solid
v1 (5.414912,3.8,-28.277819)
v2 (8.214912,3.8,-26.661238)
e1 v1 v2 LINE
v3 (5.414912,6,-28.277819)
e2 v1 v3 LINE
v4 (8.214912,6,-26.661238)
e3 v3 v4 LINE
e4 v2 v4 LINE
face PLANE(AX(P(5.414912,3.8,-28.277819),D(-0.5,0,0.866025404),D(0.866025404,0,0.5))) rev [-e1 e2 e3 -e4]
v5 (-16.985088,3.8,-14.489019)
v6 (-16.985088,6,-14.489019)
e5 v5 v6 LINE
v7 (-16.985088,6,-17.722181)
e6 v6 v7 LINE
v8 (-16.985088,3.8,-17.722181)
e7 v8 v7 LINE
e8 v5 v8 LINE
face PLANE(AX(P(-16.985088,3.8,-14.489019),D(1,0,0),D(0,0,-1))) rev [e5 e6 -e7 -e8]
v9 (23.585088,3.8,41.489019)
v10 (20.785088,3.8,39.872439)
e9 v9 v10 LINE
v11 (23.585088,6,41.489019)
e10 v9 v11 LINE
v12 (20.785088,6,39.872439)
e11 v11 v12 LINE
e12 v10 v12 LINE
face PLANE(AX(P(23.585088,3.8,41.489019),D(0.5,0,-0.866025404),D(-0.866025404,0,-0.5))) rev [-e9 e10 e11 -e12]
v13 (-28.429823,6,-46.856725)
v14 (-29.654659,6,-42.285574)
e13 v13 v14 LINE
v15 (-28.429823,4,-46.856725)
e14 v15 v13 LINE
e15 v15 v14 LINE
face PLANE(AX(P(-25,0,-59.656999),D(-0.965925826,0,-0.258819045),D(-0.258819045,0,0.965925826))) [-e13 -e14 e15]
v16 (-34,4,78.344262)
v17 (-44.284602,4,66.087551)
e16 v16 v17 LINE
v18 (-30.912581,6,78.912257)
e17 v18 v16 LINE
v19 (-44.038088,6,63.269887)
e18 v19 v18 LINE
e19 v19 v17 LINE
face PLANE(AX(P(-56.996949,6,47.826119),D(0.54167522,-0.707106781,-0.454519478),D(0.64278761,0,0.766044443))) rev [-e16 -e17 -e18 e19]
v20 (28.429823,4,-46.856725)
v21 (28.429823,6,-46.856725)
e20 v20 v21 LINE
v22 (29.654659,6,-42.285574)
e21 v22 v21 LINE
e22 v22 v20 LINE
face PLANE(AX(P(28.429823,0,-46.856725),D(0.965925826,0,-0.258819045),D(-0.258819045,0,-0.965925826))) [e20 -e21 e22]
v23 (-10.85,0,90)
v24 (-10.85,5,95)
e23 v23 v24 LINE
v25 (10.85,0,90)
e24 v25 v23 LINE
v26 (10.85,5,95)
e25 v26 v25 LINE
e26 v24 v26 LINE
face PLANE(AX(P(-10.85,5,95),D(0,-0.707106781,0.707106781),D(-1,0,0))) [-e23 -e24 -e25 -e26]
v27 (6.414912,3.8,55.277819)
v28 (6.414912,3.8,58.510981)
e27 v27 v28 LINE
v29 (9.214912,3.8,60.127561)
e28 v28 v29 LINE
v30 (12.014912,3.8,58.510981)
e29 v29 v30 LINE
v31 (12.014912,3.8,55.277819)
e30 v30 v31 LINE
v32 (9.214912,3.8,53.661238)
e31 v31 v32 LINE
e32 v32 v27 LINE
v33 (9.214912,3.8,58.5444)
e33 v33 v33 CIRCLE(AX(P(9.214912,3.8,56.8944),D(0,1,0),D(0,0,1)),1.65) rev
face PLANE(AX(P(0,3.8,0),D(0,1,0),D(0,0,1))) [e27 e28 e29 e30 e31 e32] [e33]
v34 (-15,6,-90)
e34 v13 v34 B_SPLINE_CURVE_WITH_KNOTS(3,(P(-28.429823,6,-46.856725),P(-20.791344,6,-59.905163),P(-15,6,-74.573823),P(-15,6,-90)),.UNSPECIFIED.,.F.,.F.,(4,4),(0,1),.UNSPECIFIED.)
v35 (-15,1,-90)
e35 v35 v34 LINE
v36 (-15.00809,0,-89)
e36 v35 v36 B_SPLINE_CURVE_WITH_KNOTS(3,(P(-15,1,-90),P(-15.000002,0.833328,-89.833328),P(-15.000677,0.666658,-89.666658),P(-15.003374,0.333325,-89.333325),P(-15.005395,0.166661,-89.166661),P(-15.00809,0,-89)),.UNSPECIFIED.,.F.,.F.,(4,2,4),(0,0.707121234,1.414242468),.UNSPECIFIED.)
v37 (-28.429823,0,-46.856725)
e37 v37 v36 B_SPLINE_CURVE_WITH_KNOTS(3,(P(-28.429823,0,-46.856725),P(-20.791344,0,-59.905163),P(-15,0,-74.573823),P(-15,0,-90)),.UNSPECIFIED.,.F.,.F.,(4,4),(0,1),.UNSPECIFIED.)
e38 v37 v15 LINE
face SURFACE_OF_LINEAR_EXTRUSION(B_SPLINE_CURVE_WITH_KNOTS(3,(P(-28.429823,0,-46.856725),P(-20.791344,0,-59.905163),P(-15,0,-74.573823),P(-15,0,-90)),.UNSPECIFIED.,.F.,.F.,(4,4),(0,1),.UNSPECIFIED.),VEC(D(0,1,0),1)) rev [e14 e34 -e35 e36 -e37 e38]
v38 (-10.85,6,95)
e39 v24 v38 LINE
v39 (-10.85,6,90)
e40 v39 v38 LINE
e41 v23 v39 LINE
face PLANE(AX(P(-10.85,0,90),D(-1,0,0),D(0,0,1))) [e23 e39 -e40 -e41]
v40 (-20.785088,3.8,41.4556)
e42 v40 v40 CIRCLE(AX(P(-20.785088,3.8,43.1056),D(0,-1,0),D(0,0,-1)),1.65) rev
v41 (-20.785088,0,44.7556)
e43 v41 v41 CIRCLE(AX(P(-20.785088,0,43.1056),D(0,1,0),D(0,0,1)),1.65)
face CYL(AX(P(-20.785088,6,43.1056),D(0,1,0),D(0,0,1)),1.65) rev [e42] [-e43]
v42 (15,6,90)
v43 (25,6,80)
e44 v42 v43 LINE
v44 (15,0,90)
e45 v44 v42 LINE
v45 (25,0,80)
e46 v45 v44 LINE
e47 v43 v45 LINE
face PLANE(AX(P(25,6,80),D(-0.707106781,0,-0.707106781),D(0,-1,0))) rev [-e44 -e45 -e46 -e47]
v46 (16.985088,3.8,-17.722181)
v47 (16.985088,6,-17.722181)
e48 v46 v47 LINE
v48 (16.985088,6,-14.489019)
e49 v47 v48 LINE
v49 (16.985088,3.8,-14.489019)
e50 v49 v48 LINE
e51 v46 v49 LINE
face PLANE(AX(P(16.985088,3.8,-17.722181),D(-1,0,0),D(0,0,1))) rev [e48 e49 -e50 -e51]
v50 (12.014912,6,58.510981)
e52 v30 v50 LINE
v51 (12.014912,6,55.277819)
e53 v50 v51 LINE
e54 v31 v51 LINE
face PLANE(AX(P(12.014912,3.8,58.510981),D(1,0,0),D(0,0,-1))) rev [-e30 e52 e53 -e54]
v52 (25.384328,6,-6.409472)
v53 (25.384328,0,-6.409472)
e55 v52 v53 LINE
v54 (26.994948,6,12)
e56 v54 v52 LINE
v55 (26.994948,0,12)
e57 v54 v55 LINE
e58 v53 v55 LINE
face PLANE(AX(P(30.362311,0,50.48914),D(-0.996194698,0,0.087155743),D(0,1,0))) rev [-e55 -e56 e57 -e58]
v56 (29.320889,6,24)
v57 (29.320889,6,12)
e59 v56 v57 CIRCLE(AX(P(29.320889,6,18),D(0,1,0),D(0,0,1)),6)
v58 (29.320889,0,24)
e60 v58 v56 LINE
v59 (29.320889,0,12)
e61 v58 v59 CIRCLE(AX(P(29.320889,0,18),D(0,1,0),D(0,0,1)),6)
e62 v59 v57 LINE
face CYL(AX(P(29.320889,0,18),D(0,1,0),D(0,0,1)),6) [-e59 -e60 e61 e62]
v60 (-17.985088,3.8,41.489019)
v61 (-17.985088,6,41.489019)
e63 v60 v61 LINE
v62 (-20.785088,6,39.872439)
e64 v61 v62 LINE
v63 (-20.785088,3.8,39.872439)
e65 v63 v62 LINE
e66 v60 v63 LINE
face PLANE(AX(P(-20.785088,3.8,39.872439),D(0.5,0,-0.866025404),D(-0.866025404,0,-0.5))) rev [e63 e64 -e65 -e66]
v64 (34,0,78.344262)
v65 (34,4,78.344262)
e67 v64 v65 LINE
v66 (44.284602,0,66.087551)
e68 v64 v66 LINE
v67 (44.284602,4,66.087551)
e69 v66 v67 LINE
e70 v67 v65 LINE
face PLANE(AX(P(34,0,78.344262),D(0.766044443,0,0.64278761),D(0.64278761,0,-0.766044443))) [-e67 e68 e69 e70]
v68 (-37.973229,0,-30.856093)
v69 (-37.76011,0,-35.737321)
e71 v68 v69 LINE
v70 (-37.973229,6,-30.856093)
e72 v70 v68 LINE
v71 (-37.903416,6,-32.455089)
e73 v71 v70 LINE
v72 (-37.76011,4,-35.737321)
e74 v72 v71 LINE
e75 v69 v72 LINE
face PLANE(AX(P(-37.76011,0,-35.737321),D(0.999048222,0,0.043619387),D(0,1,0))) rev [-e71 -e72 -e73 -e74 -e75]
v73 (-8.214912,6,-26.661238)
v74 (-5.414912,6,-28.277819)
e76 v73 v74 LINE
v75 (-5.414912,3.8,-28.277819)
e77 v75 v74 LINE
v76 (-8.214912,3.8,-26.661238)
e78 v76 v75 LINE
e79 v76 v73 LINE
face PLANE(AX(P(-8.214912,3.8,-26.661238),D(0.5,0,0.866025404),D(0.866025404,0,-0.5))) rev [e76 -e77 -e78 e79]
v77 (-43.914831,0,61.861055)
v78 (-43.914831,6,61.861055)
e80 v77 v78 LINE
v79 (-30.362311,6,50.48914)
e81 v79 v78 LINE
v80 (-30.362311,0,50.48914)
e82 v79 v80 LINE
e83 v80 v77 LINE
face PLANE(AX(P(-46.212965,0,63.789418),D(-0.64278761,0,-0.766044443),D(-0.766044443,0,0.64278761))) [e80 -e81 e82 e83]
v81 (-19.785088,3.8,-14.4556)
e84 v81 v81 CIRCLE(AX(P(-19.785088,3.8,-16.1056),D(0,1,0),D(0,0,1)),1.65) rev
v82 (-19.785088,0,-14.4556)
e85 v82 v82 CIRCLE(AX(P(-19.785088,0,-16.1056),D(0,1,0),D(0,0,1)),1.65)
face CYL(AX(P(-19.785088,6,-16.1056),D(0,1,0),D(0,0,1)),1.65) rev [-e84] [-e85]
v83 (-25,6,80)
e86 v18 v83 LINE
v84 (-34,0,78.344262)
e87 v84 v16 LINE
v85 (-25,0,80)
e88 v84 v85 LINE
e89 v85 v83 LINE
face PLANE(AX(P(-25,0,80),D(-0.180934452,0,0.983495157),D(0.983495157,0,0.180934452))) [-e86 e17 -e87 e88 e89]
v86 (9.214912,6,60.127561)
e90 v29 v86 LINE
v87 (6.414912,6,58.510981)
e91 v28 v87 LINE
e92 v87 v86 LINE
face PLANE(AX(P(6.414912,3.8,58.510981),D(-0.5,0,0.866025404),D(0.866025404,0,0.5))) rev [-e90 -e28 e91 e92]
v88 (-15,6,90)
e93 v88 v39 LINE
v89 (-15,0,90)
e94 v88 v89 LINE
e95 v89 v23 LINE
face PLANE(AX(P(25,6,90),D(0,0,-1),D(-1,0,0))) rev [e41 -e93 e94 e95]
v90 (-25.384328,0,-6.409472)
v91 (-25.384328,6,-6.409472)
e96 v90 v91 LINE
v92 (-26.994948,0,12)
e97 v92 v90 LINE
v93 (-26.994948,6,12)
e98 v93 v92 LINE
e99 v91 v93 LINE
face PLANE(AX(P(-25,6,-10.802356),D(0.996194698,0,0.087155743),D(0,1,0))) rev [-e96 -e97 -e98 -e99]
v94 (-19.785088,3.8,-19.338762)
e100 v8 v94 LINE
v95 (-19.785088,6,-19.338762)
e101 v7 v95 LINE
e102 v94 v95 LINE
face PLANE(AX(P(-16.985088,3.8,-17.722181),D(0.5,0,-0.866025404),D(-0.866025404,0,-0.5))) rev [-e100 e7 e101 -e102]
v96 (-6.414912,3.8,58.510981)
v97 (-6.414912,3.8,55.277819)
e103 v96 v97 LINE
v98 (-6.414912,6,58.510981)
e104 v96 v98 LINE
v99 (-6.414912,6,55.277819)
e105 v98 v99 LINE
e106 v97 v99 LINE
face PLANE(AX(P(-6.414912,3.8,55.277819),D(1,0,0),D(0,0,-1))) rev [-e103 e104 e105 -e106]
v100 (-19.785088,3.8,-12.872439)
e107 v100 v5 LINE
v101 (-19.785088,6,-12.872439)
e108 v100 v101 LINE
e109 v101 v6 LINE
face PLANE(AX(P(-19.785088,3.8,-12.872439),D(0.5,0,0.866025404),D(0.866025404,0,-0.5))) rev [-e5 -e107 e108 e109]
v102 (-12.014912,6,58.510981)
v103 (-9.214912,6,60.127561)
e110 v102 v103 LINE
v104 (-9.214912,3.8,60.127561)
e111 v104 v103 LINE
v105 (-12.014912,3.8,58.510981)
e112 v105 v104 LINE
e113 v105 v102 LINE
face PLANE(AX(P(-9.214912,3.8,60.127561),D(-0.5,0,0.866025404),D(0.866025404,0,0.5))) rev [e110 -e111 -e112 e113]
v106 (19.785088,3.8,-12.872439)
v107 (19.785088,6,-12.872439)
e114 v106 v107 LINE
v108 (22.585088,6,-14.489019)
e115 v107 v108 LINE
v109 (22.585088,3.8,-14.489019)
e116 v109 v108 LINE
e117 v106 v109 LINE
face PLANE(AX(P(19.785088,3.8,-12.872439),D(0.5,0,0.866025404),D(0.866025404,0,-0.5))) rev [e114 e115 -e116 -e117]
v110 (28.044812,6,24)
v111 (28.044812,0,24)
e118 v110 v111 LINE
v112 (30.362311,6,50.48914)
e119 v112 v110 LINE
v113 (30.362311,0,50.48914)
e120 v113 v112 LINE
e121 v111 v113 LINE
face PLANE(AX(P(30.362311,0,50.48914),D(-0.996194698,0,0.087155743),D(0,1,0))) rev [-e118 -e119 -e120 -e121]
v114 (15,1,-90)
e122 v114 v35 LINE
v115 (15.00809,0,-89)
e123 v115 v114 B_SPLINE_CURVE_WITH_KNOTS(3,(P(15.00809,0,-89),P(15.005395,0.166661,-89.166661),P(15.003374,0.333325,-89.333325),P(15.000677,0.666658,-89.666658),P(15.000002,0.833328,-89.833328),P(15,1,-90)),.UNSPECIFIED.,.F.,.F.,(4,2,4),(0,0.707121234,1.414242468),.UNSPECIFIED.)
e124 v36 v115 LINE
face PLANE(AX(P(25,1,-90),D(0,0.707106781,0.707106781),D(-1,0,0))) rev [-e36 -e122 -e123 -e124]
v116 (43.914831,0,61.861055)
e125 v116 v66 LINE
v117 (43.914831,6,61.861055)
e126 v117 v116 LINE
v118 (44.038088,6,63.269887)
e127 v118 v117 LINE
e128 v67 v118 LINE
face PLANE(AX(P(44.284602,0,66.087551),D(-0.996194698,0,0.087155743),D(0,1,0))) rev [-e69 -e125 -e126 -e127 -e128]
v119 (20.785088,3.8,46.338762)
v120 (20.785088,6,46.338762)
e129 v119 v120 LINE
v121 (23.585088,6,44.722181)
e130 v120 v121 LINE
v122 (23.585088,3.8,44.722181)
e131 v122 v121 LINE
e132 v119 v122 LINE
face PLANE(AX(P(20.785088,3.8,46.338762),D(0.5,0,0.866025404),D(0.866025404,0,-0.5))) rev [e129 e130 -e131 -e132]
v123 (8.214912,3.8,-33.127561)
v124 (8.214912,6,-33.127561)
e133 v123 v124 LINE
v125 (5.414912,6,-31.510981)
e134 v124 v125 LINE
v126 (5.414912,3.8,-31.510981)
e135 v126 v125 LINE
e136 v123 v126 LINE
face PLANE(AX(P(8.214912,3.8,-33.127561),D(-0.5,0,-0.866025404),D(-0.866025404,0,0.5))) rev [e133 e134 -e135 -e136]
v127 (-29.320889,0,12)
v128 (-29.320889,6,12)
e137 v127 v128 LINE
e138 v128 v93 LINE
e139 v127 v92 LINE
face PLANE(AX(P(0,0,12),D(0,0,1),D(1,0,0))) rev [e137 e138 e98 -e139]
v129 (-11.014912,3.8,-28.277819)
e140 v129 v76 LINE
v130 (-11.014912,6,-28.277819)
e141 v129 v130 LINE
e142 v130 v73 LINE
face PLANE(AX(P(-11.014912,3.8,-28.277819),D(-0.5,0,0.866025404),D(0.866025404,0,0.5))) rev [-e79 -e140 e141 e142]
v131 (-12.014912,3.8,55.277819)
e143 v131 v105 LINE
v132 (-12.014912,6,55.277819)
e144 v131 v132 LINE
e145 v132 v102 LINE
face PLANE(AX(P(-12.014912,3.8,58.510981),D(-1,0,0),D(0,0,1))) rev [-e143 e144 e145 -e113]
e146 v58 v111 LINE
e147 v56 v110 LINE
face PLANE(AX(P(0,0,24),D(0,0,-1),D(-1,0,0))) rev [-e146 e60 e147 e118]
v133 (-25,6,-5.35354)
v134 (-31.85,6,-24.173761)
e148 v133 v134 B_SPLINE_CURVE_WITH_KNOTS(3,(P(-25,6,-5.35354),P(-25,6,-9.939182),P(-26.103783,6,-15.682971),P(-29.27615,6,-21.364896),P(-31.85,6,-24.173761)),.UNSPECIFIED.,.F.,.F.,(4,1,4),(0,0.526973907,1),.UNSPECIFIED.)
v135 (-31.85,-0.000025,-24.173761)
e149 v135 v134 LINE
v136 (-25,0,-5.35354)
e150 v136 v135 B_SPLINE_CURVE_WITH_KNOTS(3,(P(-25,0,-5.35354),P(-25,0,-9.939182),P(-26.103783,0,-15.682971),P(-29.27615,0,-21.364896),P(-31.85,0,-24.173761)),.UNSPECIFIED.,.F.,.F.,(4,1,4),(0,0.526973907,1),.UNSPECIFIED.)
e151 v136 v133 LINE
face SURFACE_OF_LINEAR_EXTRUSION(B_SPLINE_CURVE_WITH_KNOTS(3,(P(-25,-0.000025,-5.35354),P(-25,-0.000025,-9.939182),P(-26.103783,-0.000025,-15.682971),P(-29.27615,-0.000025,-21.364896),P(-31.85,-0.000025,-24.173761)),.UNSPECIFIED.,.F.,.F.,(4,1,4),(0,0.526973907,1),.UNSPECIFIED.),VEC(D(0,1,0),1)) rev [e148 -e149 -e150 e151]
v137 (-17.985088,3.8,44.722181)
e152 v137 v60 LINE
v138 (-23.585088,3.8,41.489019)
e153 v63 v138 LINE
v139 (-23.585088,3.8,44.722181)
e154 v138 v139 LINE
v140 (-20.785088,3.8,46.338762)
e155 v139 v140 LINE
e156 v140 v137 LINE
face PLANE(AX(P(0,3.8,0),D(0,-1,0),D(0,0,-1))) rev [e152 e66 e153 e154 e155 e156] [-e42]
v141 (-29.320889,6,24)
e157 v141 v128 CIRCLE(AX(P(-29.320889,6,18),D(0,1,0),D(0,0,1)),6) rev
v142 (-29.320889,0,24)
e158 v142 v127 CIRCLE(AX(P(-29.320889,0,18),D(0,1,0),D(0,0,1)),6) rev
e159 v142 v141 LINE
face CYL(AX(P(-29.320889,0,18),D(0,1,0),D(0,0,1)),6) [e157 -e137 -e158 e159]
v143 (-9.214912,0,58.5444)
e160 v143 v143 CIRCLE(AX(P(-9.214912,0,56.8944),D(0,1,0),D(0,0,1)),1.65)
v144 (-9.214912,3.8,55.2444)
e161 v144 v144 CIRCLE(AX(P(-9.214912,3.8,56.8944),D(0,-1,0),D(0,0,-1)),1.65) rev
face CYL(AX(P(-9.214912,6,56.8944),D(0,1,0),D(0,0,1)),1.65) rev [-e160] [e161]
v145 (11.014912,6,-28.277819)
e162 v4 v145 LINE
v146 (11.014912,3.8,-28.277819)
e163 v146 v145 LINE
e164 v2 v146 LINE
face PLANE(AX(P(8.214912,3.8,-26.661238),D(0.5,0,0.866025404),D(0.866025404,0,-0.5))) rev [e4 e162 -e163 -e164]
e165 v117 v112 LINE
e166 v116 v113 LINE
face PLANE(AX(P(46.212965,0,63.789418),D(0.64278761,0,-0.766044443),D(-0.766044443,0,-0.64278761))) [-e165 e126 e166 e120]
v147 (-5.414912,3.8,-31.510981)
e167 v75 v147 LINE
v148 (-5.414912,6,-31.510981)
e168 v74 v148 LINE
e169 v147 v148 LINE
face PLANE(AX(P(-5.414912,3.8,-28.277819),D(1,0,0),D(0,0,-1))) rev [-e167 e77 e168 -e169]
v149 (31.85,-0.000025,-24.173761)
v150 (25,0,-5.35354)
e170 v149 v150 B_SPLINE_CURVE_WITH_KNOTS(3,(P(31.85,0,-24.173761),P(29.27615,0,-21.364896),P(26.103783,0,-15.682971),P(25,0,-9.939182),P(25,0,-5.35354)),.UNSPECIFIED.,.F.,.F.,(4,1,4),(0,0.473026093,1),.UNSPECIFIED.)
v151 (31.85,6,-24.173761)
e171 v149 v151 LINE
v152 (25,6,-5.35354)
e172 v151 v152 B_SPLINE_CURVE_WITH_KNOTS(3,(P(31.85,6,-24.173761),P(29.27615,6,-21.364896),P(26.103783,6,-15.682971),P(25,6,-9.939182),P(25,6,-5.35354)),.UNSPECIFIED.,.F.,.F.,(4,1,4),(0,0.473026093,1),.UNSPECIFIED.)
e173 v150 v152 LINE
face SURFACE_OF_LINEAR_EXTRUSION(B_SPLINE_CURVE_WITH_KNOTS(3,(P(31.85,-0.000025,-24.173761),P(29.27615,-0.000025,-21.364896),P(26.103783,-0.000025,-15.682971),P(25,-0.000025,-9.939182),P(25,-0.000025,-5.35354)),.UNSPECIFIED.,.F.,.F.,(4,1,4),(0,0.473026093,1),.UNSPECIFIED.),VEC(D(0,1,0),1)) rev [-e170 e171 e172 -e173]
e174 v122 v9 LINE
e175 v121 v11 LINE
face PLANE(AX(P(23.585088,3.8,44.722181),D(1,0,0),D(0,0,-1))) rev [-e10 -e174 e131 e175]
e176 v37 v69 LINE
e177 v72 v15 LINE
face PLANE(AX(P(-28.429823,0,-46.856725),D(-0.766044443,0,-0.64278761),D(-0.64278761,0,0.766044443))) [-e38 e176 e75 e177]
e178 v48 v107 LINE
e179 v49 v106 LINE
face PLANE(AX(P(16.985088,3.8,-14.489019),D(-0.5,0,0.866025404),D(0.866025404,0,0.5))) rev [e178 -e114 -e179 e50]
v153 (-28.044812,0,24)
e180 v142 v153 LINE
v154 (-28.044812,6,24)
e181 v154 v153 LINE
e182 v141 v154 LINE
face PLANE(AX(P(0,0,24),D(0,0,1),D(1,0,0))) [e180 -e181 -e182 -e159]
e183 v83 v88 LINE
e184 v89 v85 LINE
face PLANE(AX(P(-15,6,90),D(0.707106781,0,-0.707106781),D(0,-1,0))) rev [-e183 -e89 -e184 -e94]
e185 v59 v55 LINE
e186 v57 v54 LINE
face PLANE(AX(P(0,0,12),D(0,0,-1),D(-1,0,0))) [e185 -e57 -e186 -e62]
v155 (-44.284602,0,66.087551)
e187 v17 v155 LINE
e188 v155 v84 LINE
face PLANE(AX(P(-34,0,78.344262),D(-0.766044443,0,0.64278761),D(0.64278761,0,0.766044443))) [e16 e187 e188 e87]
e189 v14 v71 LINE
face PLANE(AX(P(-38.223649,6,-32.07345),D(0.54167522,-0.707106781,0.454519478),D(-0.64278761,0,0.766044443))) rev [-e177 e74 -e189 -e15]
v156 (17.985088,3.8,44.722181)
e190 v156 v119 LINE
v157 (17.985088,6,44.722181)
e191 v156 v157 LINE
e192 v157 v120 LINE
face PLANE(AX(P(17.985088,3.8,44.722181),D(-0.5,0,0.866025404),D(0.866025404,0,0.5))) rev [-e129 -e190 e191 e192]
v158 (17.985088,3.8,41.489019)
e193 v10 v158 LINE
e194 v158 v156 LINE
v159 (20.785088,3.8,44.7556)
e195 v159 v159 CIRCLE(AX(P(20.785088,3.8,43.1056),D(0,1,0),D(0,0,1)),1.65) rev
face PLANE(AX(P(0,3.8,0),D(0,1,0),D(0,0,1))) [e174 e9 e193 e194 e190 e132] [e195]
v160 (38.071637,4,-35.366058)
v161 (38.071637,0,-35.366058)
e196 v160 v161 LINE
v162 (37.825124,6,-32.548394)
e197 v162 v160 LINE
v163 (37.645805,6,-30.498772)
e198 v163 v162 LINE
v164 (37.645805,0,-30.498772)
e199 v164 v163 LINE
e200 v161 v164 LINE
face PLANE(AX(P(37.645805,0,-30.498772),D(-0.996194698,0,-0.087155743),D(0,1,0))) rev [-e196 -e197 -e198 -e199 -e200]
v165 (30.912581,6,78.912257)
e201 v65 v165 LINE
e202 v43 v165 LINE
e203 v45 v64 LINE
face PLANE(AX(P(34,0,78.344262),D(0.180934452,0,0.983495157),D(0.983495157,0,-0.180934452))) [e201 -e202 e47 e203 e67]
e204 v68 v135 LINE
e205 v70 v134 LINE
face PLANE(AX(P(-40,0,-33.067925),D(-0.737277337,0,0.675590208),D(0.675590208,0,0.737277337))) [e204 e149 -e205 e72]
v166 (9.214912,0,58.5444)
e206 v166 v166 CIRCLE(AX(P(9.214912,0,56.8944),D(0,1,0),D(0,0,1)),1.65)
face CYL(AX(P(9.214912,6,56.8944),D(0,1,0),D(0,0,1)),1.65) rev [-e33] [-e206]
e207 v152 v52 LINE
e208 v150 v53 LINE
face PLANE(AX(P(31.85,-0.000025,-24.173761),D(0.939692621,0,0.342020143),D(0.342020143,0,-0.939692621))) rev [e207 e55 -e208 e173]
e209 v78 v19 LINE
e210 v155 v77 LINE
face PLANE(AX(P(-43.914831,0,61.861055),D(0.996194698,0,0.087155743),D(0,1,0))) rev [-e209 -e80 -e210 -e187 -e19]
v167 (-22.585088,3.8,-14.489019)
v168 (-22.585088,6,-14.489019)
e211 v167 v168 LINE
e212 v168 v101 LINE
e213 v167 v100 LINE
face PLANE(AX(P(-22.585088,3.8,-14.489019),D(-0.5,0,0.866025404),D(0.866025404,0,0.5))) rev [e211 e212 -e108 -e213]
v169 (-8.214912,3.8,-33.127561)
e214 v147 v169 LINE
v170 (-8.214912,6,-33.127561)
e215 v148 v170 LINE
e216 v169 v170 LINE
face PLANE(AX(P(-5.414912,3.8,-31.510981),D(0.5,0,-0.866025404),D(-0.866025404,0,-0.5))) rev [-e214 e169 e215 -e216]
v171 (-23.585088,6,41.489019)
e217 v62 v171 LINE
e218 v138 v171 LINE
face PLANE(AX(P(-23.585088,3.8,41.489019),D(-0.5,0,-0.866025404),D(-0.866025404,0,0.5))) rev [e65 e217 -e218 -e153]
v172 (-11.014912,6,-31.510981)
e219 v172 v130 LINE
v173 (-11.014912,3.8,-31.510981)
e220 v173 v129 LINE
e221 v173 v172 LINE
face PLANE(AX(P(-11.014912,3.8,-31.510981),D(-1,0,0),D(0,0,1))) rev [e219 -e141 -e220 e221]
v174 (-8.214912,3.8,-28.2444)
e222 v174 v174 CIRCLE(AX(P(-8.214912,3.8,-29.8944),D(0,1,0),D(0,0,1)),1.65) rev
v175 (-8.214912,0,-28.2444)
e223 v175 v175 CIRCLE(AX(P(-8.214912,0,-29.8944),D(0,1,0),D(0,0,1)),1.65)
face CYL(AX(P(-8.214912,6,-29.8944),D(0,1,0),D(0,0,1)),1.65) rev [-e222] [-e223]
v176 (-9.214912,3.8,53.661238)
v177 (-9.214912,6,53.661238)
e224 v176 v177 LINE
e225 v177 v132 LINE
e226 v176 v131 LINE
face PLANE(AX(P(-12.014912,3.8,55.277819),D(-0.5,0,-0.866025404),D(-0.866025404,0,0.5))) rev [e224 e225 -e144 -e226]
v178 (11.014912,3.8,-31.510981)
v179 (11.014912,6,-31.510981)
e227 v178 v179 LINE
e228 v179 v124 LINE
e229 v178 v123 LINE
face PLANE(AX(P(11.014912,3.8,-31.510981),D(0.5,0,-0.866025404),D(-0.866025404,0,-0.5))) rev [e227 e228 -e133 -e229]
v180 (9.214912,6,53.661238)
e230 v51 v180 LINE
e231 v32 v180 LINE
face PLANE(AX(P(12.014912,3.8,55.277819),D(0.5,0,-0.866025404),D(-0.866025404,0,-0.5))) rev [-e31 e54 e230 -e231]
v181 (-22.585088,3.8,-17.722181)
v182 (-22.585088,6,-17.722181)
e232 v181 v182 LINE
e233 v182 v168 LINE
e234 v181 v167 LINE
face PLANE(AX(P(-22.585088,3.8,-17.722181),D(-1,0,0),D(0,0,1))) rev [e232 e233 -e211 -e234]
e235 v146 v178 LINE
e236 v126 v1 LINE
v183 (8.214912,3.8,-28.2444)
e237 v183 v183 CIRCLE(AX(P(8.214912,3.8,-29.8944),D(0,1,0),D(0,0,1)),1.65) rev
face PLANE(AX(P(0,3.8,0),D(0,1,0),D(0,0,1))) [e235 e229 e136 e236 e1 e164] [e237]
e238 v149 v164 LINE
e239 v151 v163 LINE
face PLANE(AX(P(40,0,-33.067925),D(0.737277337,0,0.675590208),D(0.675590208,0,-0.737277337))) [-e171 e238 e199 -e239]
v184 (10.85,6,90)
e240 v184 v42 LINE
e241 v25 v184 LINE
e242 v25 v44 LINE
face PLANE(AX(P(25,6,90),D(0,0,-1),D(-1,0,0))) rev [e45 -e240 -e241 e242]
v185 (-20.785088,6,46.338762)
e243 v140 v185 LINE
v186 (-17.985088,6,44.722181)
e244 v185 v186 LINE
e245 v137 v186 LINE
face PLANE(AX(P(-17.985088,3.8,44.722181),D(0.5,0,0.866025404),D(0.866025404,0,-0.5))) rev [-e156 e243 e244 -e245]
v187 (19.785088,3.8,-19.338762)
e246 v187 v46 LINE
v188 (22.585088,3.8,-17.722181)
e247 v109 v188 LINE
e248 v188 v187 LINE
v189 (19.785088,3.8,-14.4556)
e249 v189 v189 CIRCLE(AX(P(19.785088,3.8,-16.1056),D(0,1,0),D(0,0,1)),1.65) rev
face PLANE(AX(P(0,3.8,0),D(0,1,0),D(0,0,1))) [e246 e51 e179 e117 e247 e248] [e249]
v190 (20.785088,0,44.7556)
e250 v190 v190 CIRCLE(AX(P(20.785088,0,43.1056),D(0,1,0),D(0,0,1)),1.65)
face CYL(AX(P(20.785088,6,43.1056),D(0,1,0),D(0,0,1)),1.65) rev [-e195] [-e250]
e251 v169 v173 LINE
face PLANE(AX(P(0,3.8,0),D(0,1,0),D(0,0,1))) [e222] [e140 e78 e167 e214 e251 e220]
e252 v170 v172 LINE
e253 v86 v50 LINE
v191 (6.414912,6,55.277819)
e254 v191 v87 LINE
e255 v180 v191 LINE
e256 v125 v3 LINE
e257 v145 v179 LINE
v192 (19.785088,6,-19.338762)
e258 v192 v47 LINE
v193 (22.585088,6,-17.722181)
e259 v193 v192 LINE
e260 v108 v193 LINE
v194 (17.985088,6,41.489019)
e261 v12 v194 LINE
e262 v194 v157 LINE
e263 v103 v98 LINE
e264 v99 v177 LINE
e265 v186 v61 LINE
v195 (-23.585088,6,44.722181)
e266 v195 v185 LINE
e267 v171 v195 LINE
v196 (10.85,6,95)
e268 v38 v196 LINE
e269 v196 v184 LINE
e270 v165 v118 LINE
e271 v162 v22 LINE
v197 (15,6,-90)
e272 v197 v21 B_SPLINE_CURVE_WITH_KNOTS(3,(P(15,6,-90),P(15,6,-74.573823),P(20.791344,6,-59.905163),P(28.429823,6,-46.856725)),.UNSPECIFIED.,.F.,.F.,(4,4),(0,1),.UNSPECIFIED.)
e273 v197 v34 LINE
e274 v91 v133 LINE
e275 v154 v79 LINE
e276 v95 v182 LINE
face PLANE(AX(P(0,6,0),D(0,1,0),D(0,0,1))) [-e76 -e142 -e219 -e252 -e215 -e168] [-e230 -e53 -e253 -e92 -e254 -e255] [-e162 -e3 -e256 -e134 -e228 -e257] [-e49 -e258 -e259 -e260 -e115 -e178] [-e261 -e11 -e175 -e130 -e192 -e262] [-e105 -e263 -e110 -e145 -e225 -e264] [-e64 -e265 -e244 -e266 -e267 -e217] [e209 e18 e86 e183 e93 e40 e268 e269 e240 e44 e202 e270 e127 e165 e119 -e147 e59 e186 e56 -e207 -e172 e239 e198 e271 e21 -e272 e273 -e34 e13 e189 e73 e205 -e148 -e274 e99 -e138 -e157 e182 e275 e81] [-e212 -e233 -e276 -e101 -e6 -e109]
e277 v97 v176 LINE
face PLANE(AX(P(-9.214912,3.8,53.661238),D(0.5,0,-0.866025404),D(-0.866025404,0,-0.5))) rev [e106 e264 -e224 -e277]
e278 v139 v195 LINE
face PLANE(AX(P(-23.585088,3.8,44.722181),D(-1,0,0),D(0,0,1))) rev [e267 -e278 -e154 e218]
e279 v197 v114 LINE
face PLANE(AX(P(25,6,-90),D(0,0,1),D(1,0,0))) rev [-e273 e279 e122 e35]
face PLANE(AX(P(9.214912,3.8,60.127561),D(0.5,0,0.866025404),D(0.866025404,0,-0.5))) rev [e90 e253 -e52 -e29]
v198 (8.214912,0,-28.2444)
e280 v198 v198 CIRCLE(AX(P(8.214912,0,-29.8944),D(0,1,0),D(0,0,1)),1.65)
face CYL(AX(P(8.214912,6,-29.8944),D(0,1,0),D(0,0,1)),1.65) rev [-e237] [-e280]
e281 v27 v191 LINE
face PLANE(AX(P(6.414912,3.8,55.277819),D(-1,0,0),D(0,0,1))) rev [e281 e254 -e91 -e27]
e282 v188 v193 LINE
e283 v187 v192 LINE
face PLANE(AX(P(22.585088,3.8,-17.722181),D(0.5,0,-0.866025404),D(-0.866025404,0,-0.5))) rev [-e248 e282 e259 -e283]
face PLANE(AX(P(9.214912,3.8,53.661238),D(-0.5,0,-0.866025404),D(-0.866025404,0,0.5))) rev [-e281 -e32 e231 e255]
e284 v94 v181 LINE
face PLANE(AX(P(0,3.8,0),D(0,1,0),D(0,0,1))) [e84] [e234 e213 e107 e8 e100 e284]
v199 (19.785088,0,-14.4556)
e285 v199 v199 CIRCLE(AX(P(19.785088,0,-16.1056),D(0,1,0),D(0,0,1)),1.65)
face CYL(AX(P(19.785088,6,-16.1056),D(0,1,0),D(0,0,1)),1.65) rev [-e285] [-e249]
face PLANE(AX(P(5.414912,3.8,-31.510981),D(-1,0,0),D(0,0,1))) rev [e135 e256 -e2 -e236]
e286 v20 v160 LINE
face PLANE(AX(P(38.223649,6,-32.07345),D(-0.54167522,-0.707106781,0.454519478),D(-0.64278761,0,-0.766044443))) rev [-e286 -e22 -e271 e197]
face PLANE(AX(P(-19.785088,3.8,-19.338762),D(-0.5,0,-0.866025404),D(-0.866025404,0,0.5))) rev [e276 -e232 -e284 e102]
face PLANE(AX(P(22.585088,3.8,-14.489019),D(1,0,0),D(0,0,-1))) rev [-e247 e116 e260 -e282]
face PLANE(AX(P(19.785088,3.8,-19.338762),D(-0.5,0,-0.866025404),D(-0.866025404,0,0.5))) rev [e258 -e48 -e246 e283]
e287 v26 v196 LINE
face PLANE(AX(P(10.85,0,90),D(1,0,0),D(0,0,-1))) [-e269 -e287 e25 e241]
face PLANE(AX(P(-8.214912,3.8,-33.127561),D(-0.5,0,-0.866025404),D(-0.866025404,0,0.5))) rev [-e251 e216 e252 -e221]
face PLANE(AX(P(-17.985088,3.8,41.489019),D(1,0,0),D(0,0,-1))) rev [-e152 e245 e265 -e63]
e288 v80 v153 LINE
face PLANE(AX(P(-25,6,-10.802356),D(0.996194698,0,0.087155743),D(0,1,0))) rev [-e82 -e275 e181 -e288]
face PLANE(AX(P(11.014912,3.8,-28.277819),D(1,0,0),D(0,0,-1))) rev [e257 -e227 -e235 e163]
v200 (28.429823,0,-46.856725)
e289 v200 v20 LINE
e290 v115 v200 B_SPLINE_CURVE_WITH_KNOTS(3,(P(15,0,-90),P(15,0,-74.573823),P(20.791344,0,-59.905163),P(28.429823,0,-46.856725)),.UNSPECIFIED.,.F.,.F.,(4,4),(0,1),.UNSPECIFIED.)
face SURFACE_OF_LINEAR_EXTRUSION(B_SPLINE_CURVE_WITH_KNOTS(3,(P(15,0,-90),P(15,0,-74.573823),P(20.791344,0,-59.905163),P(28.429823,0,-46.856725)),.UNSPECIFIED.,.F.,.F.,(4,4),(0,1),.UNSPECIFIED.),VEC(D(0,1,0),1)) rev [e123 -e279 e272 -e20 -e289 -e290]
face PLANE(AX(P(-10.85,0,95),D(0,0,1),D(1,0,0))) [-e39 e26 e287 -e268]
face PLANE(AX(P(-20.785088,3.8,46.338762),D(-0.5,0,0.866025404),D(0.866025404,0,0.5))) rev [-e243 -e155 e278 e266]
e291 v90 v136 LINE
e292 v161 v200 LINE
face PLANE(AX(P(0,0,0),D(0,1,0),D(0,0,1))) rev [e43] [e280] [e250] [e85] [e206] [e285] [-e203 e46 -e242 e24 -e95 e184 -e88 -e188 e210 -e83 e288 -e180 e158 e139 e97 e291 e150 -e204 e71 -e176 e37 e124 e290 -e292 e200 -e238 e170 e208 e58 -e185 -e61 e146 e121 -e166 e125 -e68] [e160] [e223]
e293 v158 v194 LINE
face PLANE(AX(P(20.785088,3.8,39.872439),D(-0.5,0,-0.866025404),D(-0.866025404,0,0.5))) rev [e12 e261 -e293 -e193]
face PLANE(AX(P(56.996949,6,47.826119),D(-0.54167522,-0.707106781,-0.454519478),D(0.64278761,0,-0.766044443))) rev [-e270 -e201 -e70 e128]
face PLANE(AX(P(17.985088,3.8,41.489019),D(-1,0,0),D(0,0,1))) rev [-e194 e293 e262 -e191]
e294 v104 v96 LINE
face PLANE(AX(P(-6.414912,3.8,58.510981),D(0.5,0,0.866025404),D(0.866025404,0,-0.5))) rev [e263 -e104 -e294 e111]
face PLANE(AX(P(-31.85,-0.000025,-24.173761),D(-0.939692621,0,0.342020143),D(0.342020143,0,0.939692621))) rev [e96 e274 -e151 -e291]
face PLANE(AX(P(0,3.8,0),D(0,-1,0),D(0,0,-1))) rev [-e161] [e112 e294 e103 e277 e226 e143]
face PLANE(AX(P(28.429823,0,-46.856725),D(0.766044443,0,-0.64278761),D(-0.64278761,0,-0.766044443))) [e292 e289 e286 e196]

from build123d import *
from OCP.BRepFilletAPI import BRepFilletAPI_MakeChamfer

# Parameters (mm, degrees)
SKETCH1_W                  = 50
SKETCH1_H                  = 180
BOSS_EXTRUDE1_DEPTH        = 6
CHAMFER2_SIZE              = 10
F_3_3_3_3_DIAMETER_HOLE1_D = 3.3
BOSS_EXTRUDE3_DEPTH        = 6
CUT_EXTRUDE3_DEPTH         = 2.2
BOSS_EXTRUDE4_DEPTH        = 6
CHAMFER14_SIZE             = 2
CHAMFER16_SIZE             = 7
CHAMFER16_SIZE_2           = 56.79198309
CHAMFER17_SIZE             = 2
SKETCH59_W                 = 21.7
SKETCH59_H                 = 5
BOSS_EXTRUDE5_DEPTH        = 6
CHAMFER19_SIZE             = 5
CUT_EXTRUDE28_DEPTH        = 106.814167745
CHAMFER20_SIZE             = 3
CHAMFER20_SIZE2            = 3.484649721
CUT_EXTRUDE29_DEPTH        = 105.986313168
CHAMFER24_SIZE             = 1
CUT_EXTRUDE31_DEPTH        = 105.986313306
SKETCH66_R                 = 6
BOSS_EXTRUDE6_DEPTH        = 6


with BuildPart() as part:
    # Sketch1 → Boss-Extrude1 (new body)
    with BuildSketch(Plane(origin=(0, 0, 0), x_dir=(1, 0, 0), z_dir=(0, 1, 0))):
        Rectangle(SKETCH1_W, SKETCH1_H)
    extrude(amount=BOSS_EXTRUDE1_DEPTH)

    # Chamfer2
    chamfer2_edges = [part.edges().sort_by_distance(p)[0] for p in [
        (-25, 3, -90),
        (25, 3, -90),
        (25, 3, 90),
        (-25, 3, 90),
    ]]
    chamfer(chamfer2_edges, length=CHAMFER2_SIZE)

    # Ø3.3 (3.3) Diameter Hole1 (through all)
    with Locations(Plane(origin=(0, 6, 0), x_dir=(1, 0, 0), z_dir=(0, 1, 0))):
        with Locations((-19.785088487, 16.105600012), (9.214911513, -56.894399988), (20.785088487, -43.105600012), (-9.214911513, -56.894399988), (-20.785088487, -43.105600012), (19.785088487, 16.105600012), (8.214911513, 29.894399988), (-8.214911513, 29.894399988)):
            Hole(F_3_3_3_3_DIAMETER_HOLE1_D / 2)

    # Sketch52 → Boss-Extrude3 (add, through all)
    with BuildSketch(Plane(origin=(0, 6, 0), x_dir=(1, 0, 0), z_dir=(0, 1, 0))):
        Polygon((40, 33.067924807), (31.85, 24.173760523), (25, 5.3535402), (25, 59.656998575), (28.429823026, 46.856724783), align=None)
        Polygon((-28.429823026, 46.856724783), (-40, 33.067924807), (-31.85, 24.173760523), (-25, 5.3535402), (-25, 59.656998575), align=None)
    extrude(amount=-BOSS_EXTRUDE3_DEPTH)

    # Sketch11 → Cut-Extrude3 (cut)
    with BuildSketch(Plane(origin=(0, 6, 0), x_dir=(1, 0, 0), z_dir=(0, 1, 0))):
        Polygon((23.585088487, -44.722180766), (23.585088487, -41.489019258), (20.785088487, -39.872438504), (17.985088487, -41.489019258), (17.985088487, -44.722180766), (20.785088487, -46.338761519), align=None)
        Polygon((9.214911513, -60.127561496), (12.014911513, -58.510980742), (12.014911513, -55.277819234), (9.214911513, -53.661238481), (6.414911513, -55.277819234), (6.414911513, -58.510980742), align=None)
        Polygon((-6.414911513, -58.510980742), (-9.214911513, -60.127561496), (-12.014911513, -58.510980742), (-12.014911513, -55.277819234), (-9.214911513, -53.661238481), (-6.414911513, -55.277819234), align=None)
        Polygon((-20.785088487, -46.338761519), (-23.585088487, -44.722180766), (-23.585088487, -41.489019258), (-20.785088487, -39.872438504), (-17.985088487, -41.489019258), (-17.985088487, -44.722180766), align=None)
        Polygon((19.785088487, 12.872438504), (22.585088487, 14.489019258), (22.585088487, 17.722180766), (19.785088487, 19.338761519), (16.985088487, 17.722180766), (16.985088487, 14.489019258), align=None)
        Polygon((8.214911513, 26.661238481), (11.014911513, 28.277819234), (11.014911513, 31.510980742), (8.214911513, 33.127561496), (5.414911513, 31.510980742), (5.414911513, 28.277819234), align=None)
        Polygon((-19.785088487, 12.872438504), (-16.985088487, 14.489019258), (-16.985088487, 17.722180766), (-19.785088487, 19.338761519), (-22.585088487, 17.722180766), (-22.585088487, 14.489019258), align=None)
        Polygon((-8.214911513, 26.661238481), (-5.414911513, 28.277819234), (-5.414911513, 31.510980742), (-8.214911513, 33.127561496), (-11.014911513, 31.510980742), (-11.014911513, 28.277819234), align=None)
    extrude(amount=-CUT_EXTRUDE3_DEPTH, mode=Mode.SUBTRACT)

    # Sketch53 → Boss-Extrude4 (add, through all)
    with BuildSketch(Plane(origin=(0, 6, 0), x_dir=(1, 0, 0), z_dir=(0, 1, 0))):
        Polygon((25, -45.989627063), (25, -80), (34, -78.344262241), (46.212964584, -63.789417822), align=None)
        Polygon((-46.212964584, -63.789417822), (-25, -45.989627063), (-25, -80), (-34, -78.344262241), align=None)
    extrude(amount=-BOSS_EXTRUDE4_DEPTH)

    # Chamfer14
    chamfer14_edges = [part.edges().sort_by_distance(p)[0] for p in [
        (-40.106482292, 6, 71.066840031),
        (40.106482292, 6, 71.066840031),
    ]]
    chamfer(chamfer14_edges, length=CHAMFER14_SIZE)

    # Chamfer16
    # the kernel refuses this chamfer: 56.79198309, 7 mm, written as the material it adds along each edge
    with BuildSketch(Plane(origin=(25, 6, 45.989627063), x_dir=(0.6351042832999635, 0, 0.7724264038301901), z_dir=(0, -1, 0))) as chamfer16_piece_1:
        Polygon((CHAMFER16_SIZE * 0.9830242288, -CHAMFER16_SIZE * 0.183475790208), (-CHAMFER16_SIZE_2 * 0.772426403828, -CHAMFER16_SIZE_2 * 0.635104283298), (0, 0), align=None)
    extrude(amount=6)
    with BuildSketch(Plane(origin=(-25, 6, 45.989627063), x_dir=(-0.6351042832999635, 0, 0.7724264038301901), z_dir=(0, -1, 0))) as chamfer16_piece_2:
        Polygon((CHAMFER16_SIZE * 0.9830242288, CHAMFER16_SIZE * 0.183475790208), (-CHAMFER16_SIZE_2 * 0.772426403828, CHAMFER16_SIZE_2 * 0.635104283298), (0, 0), align=None)
    extrude(amount=6)

    # Chamfer17
    chamfer17_edges = [part.edges().sort_by_distance(p)[0] for p in [
        (-34.214911513, 6, -39.962324795),
        (34.214911513, 6, -39.962324795),
    ]]
    chamfer(chamfer17_edges, length=CHAMFER17_SIZE)

    # Sketch59 → Boss-Extrude5 (add, through all)
    with BuildSketch(Plane(origin=(0, 6, 0), x_dir=(1, 0, 0), z_dir=(0, 1, 0))):
        with Locations((0, -92.5)):
            Rectangle(SKETCH59_W, SKETCH59_H)
    extrude(amount=-BOSS_EXTRUDE5_DEPTH)

    # Chamfer19
    chamfer19_edges = [part.edges().sort_by_distance(p)[0] for p in [
        (0, 0, 95),
    ]]
    chamfer(chamfer19_edges, length=CHAMFER19_SIZE)

    # Sketch61 → Cut-Extrude28 (cut, through all)
    with BuildSketch(Plane.XZ):
        Polygon((25, -59.656998575), (15, -90), (25, -80), align=None)
        Polygon((-25, -80), (-25, -59.656998575), (-15, -90), align=None)
    extrude(amount=-CUT_EXTRUDE28_DEPTH, mode=Mode.SUBTRACT)

    # Chamfer20: one chamfer whose edges measure the first distance from different faces: ONE call of the kernel's chamfer builder (chamfer() names one face for all edges)
    chamfer20_edges_1 = [part.edges().sort_by_distance(p)[0] for p in [
        (-40, 2, -33.067924807),
    ]]
    chamfer20_side_1 = [part.faces().sort_by_distance(p)[0] for p in [
        (-35.821197815, 2.933105821, -28.507562458),
    ]]
    chamfer20_edges_2 = [part.edges().sort_by_distance(p)[0] for p in [
        (40, 2, -33.067924807),
    ]]
    chamfer20_side_2 = [part.faces().sort_by_distance(p)[0] for p in [
        (34.214911513, 2, -39.962324795),
    ]]
    chamfer20_edges_3 = [part.edges().sort_by_distance(p)[0] for p in [
        (-46.212964584, 2, 63.789417822),
        (46.212964584, 2, 63.789417822),
    ]]
    chamfer20 = BRepFilletAPI_MakeChamfer(part.part.solid().wrapped)
    for e in chamfer20_edges_1:
        chamfer20.Add(CHAMFER20_SIZE, CHAMFER20_SIZE2, e.wrapped, chamfer20_side_1[0].wrapped)  # the first distance lies on this face
    for e in chamfer20_edges_2:
        chamfer20.Add(CHAMFER20_SIZE, CHAMFER20_SIZE2, e.wrapped, chamfer20_side_2[0].wrapped)  # the first distance lies on this face
    for e in chamfer20_edges_3:
        chamfer20.Add(CHAMFER20_SIZE, e.wrapped)
    add(Compound.cast(chamfer20.Shape()), mode=Mode.REPLACE)

    # Sketch62 → Cut-Extrude29 (cut, through all)
    with BuildSketch(Plane(origin=(0, 6, 0), x_dir=(1, 0, 0), z_dir=(0, 1, 0))):
        with BuildLine():
            Line((15, 90), (25, 59.656998575))
            Line((25, 59.656998575), (28.429823026, 46.856724783))
            add(Edge.make_bspline(
                [(28.429823026, 46.856724783), (20.791344098, 59.90516311), (15, 74.573823319), (15, 90)],
                knots=[0, 0, 0, 0, 1, 1, 1, 1], degree=3))
        make_face()
        with BuildLine():
            Line((-25, 59.656998575), (-28.429823026, 46.856724783))
            add(Edge.make_bspline(
                [(-28.429823026, 46.856724783), (-20.791344098, 59.90516311), (-15, 74.573823319), (-15, 90)],
                knots=[0, 0, 0, 0, 1, 1, 1, 1], degree=3))
            Line((-15, 90), (-25, 59.656998575))
        make_face()
    extrude(amount=-CUT_EXTRUDE29_DEPTH, mode=Mode.SUBTRACT)

    # Chamfer24
    chamfer24_edges = [part.edges().sort_by_distance(p)[0] for p in [
        (0, 0, -90),
    ]]
    chamfer(chamfer24_edges, length=CHAMFER24_SIZE)

    # Sketch64 → Cut-Extrude31 (cut, through all)
    with BuildSketch(Plane(origin=(0, 6, 0), x_dir=(1, 0, 0), z_dir=(0, 1, 0))):
        with BuildLine():
            Line((31.85, 24.173760523), (25, 5.3535402))
            add(Edge.make_bspline(
                [(25, 5.3535402), (25, 9.939182196), (26.103782981, 15.682971222), (29.276150019, 21.364896158), (31.85, 24.173760523)],
                knots=[0, 0, 0, 0, 0.526973907, 1, 1, 1, 1], degree=3))
        make_face()
        with BuildLine():
            Line((-31.85, 24.173760523), (-25, 5.3535402))
            add(Edge.make_bspline(
                [(-25, 5.3535402), (-25, 9.939182196), (-26.103782981, 15.682971222), (-29.276150019, 21.364896158), (-31.85, 24.173760523)],
                knots=[0, 0, 0, 0, 0.526973907, 1, 1, 1, 1], degree=3))
        make_face()
    extrude(amount=-CUT_EXTRUDE31_DEPTH, mode=Mode.SUBTRACT)

    # Sketch66 → Boss-Extrude6 (add)
    with BuildSketch(Plane(origin=(0, 6, 0), x_dir=(1, 0, 0), z_dir=(0, 1, 0))):
        with Locations((29.320888862, -18)):
            Circle(SKETCH66_R)
        with BuildLine():
            ThreePointArc((25, -13.837078017), (26.973287097, -12.478336668), (29.320888862, -12))
            Line((29.320888862, -12), (25, -12))
            Line((25, -12), (25, -13.837078017))
        make_face()
        with BuildLine():
            Line((25, -24), (29.320888862, -24))
            ThreePointArc((29.320888862, -24), (26.973287097, -23.521663332), (25, -22.162921983))
            Line((25, -22.162921983), (25, -24))
        make_face()
        with Locations((-29.320888862, -18)):
            Circle(SKETCH66_R)
        with BuildLine():
            Line((-25, -12), (-29.320888862, -12))
            ThreePointArc((-29.320888862, -12), (-26.973287097, -12.478336668), (-25, -13.837078017))
            Line((-25, -13.837078017), (-25, -12))
        make_face()
        with BuildLine():
            ThreePointArc((-25, -22.162921983), (-26.973287097, -23.521663332), (-29.320888862, -24))
            Line((-29.320888862, -24), (-25, -24))
            Line((-25, -24), (-25, -22.162921983))
        make_face()
    extrude(amount=-BOSS_EXTRUDE6_DEPTH)


solid = part.part
